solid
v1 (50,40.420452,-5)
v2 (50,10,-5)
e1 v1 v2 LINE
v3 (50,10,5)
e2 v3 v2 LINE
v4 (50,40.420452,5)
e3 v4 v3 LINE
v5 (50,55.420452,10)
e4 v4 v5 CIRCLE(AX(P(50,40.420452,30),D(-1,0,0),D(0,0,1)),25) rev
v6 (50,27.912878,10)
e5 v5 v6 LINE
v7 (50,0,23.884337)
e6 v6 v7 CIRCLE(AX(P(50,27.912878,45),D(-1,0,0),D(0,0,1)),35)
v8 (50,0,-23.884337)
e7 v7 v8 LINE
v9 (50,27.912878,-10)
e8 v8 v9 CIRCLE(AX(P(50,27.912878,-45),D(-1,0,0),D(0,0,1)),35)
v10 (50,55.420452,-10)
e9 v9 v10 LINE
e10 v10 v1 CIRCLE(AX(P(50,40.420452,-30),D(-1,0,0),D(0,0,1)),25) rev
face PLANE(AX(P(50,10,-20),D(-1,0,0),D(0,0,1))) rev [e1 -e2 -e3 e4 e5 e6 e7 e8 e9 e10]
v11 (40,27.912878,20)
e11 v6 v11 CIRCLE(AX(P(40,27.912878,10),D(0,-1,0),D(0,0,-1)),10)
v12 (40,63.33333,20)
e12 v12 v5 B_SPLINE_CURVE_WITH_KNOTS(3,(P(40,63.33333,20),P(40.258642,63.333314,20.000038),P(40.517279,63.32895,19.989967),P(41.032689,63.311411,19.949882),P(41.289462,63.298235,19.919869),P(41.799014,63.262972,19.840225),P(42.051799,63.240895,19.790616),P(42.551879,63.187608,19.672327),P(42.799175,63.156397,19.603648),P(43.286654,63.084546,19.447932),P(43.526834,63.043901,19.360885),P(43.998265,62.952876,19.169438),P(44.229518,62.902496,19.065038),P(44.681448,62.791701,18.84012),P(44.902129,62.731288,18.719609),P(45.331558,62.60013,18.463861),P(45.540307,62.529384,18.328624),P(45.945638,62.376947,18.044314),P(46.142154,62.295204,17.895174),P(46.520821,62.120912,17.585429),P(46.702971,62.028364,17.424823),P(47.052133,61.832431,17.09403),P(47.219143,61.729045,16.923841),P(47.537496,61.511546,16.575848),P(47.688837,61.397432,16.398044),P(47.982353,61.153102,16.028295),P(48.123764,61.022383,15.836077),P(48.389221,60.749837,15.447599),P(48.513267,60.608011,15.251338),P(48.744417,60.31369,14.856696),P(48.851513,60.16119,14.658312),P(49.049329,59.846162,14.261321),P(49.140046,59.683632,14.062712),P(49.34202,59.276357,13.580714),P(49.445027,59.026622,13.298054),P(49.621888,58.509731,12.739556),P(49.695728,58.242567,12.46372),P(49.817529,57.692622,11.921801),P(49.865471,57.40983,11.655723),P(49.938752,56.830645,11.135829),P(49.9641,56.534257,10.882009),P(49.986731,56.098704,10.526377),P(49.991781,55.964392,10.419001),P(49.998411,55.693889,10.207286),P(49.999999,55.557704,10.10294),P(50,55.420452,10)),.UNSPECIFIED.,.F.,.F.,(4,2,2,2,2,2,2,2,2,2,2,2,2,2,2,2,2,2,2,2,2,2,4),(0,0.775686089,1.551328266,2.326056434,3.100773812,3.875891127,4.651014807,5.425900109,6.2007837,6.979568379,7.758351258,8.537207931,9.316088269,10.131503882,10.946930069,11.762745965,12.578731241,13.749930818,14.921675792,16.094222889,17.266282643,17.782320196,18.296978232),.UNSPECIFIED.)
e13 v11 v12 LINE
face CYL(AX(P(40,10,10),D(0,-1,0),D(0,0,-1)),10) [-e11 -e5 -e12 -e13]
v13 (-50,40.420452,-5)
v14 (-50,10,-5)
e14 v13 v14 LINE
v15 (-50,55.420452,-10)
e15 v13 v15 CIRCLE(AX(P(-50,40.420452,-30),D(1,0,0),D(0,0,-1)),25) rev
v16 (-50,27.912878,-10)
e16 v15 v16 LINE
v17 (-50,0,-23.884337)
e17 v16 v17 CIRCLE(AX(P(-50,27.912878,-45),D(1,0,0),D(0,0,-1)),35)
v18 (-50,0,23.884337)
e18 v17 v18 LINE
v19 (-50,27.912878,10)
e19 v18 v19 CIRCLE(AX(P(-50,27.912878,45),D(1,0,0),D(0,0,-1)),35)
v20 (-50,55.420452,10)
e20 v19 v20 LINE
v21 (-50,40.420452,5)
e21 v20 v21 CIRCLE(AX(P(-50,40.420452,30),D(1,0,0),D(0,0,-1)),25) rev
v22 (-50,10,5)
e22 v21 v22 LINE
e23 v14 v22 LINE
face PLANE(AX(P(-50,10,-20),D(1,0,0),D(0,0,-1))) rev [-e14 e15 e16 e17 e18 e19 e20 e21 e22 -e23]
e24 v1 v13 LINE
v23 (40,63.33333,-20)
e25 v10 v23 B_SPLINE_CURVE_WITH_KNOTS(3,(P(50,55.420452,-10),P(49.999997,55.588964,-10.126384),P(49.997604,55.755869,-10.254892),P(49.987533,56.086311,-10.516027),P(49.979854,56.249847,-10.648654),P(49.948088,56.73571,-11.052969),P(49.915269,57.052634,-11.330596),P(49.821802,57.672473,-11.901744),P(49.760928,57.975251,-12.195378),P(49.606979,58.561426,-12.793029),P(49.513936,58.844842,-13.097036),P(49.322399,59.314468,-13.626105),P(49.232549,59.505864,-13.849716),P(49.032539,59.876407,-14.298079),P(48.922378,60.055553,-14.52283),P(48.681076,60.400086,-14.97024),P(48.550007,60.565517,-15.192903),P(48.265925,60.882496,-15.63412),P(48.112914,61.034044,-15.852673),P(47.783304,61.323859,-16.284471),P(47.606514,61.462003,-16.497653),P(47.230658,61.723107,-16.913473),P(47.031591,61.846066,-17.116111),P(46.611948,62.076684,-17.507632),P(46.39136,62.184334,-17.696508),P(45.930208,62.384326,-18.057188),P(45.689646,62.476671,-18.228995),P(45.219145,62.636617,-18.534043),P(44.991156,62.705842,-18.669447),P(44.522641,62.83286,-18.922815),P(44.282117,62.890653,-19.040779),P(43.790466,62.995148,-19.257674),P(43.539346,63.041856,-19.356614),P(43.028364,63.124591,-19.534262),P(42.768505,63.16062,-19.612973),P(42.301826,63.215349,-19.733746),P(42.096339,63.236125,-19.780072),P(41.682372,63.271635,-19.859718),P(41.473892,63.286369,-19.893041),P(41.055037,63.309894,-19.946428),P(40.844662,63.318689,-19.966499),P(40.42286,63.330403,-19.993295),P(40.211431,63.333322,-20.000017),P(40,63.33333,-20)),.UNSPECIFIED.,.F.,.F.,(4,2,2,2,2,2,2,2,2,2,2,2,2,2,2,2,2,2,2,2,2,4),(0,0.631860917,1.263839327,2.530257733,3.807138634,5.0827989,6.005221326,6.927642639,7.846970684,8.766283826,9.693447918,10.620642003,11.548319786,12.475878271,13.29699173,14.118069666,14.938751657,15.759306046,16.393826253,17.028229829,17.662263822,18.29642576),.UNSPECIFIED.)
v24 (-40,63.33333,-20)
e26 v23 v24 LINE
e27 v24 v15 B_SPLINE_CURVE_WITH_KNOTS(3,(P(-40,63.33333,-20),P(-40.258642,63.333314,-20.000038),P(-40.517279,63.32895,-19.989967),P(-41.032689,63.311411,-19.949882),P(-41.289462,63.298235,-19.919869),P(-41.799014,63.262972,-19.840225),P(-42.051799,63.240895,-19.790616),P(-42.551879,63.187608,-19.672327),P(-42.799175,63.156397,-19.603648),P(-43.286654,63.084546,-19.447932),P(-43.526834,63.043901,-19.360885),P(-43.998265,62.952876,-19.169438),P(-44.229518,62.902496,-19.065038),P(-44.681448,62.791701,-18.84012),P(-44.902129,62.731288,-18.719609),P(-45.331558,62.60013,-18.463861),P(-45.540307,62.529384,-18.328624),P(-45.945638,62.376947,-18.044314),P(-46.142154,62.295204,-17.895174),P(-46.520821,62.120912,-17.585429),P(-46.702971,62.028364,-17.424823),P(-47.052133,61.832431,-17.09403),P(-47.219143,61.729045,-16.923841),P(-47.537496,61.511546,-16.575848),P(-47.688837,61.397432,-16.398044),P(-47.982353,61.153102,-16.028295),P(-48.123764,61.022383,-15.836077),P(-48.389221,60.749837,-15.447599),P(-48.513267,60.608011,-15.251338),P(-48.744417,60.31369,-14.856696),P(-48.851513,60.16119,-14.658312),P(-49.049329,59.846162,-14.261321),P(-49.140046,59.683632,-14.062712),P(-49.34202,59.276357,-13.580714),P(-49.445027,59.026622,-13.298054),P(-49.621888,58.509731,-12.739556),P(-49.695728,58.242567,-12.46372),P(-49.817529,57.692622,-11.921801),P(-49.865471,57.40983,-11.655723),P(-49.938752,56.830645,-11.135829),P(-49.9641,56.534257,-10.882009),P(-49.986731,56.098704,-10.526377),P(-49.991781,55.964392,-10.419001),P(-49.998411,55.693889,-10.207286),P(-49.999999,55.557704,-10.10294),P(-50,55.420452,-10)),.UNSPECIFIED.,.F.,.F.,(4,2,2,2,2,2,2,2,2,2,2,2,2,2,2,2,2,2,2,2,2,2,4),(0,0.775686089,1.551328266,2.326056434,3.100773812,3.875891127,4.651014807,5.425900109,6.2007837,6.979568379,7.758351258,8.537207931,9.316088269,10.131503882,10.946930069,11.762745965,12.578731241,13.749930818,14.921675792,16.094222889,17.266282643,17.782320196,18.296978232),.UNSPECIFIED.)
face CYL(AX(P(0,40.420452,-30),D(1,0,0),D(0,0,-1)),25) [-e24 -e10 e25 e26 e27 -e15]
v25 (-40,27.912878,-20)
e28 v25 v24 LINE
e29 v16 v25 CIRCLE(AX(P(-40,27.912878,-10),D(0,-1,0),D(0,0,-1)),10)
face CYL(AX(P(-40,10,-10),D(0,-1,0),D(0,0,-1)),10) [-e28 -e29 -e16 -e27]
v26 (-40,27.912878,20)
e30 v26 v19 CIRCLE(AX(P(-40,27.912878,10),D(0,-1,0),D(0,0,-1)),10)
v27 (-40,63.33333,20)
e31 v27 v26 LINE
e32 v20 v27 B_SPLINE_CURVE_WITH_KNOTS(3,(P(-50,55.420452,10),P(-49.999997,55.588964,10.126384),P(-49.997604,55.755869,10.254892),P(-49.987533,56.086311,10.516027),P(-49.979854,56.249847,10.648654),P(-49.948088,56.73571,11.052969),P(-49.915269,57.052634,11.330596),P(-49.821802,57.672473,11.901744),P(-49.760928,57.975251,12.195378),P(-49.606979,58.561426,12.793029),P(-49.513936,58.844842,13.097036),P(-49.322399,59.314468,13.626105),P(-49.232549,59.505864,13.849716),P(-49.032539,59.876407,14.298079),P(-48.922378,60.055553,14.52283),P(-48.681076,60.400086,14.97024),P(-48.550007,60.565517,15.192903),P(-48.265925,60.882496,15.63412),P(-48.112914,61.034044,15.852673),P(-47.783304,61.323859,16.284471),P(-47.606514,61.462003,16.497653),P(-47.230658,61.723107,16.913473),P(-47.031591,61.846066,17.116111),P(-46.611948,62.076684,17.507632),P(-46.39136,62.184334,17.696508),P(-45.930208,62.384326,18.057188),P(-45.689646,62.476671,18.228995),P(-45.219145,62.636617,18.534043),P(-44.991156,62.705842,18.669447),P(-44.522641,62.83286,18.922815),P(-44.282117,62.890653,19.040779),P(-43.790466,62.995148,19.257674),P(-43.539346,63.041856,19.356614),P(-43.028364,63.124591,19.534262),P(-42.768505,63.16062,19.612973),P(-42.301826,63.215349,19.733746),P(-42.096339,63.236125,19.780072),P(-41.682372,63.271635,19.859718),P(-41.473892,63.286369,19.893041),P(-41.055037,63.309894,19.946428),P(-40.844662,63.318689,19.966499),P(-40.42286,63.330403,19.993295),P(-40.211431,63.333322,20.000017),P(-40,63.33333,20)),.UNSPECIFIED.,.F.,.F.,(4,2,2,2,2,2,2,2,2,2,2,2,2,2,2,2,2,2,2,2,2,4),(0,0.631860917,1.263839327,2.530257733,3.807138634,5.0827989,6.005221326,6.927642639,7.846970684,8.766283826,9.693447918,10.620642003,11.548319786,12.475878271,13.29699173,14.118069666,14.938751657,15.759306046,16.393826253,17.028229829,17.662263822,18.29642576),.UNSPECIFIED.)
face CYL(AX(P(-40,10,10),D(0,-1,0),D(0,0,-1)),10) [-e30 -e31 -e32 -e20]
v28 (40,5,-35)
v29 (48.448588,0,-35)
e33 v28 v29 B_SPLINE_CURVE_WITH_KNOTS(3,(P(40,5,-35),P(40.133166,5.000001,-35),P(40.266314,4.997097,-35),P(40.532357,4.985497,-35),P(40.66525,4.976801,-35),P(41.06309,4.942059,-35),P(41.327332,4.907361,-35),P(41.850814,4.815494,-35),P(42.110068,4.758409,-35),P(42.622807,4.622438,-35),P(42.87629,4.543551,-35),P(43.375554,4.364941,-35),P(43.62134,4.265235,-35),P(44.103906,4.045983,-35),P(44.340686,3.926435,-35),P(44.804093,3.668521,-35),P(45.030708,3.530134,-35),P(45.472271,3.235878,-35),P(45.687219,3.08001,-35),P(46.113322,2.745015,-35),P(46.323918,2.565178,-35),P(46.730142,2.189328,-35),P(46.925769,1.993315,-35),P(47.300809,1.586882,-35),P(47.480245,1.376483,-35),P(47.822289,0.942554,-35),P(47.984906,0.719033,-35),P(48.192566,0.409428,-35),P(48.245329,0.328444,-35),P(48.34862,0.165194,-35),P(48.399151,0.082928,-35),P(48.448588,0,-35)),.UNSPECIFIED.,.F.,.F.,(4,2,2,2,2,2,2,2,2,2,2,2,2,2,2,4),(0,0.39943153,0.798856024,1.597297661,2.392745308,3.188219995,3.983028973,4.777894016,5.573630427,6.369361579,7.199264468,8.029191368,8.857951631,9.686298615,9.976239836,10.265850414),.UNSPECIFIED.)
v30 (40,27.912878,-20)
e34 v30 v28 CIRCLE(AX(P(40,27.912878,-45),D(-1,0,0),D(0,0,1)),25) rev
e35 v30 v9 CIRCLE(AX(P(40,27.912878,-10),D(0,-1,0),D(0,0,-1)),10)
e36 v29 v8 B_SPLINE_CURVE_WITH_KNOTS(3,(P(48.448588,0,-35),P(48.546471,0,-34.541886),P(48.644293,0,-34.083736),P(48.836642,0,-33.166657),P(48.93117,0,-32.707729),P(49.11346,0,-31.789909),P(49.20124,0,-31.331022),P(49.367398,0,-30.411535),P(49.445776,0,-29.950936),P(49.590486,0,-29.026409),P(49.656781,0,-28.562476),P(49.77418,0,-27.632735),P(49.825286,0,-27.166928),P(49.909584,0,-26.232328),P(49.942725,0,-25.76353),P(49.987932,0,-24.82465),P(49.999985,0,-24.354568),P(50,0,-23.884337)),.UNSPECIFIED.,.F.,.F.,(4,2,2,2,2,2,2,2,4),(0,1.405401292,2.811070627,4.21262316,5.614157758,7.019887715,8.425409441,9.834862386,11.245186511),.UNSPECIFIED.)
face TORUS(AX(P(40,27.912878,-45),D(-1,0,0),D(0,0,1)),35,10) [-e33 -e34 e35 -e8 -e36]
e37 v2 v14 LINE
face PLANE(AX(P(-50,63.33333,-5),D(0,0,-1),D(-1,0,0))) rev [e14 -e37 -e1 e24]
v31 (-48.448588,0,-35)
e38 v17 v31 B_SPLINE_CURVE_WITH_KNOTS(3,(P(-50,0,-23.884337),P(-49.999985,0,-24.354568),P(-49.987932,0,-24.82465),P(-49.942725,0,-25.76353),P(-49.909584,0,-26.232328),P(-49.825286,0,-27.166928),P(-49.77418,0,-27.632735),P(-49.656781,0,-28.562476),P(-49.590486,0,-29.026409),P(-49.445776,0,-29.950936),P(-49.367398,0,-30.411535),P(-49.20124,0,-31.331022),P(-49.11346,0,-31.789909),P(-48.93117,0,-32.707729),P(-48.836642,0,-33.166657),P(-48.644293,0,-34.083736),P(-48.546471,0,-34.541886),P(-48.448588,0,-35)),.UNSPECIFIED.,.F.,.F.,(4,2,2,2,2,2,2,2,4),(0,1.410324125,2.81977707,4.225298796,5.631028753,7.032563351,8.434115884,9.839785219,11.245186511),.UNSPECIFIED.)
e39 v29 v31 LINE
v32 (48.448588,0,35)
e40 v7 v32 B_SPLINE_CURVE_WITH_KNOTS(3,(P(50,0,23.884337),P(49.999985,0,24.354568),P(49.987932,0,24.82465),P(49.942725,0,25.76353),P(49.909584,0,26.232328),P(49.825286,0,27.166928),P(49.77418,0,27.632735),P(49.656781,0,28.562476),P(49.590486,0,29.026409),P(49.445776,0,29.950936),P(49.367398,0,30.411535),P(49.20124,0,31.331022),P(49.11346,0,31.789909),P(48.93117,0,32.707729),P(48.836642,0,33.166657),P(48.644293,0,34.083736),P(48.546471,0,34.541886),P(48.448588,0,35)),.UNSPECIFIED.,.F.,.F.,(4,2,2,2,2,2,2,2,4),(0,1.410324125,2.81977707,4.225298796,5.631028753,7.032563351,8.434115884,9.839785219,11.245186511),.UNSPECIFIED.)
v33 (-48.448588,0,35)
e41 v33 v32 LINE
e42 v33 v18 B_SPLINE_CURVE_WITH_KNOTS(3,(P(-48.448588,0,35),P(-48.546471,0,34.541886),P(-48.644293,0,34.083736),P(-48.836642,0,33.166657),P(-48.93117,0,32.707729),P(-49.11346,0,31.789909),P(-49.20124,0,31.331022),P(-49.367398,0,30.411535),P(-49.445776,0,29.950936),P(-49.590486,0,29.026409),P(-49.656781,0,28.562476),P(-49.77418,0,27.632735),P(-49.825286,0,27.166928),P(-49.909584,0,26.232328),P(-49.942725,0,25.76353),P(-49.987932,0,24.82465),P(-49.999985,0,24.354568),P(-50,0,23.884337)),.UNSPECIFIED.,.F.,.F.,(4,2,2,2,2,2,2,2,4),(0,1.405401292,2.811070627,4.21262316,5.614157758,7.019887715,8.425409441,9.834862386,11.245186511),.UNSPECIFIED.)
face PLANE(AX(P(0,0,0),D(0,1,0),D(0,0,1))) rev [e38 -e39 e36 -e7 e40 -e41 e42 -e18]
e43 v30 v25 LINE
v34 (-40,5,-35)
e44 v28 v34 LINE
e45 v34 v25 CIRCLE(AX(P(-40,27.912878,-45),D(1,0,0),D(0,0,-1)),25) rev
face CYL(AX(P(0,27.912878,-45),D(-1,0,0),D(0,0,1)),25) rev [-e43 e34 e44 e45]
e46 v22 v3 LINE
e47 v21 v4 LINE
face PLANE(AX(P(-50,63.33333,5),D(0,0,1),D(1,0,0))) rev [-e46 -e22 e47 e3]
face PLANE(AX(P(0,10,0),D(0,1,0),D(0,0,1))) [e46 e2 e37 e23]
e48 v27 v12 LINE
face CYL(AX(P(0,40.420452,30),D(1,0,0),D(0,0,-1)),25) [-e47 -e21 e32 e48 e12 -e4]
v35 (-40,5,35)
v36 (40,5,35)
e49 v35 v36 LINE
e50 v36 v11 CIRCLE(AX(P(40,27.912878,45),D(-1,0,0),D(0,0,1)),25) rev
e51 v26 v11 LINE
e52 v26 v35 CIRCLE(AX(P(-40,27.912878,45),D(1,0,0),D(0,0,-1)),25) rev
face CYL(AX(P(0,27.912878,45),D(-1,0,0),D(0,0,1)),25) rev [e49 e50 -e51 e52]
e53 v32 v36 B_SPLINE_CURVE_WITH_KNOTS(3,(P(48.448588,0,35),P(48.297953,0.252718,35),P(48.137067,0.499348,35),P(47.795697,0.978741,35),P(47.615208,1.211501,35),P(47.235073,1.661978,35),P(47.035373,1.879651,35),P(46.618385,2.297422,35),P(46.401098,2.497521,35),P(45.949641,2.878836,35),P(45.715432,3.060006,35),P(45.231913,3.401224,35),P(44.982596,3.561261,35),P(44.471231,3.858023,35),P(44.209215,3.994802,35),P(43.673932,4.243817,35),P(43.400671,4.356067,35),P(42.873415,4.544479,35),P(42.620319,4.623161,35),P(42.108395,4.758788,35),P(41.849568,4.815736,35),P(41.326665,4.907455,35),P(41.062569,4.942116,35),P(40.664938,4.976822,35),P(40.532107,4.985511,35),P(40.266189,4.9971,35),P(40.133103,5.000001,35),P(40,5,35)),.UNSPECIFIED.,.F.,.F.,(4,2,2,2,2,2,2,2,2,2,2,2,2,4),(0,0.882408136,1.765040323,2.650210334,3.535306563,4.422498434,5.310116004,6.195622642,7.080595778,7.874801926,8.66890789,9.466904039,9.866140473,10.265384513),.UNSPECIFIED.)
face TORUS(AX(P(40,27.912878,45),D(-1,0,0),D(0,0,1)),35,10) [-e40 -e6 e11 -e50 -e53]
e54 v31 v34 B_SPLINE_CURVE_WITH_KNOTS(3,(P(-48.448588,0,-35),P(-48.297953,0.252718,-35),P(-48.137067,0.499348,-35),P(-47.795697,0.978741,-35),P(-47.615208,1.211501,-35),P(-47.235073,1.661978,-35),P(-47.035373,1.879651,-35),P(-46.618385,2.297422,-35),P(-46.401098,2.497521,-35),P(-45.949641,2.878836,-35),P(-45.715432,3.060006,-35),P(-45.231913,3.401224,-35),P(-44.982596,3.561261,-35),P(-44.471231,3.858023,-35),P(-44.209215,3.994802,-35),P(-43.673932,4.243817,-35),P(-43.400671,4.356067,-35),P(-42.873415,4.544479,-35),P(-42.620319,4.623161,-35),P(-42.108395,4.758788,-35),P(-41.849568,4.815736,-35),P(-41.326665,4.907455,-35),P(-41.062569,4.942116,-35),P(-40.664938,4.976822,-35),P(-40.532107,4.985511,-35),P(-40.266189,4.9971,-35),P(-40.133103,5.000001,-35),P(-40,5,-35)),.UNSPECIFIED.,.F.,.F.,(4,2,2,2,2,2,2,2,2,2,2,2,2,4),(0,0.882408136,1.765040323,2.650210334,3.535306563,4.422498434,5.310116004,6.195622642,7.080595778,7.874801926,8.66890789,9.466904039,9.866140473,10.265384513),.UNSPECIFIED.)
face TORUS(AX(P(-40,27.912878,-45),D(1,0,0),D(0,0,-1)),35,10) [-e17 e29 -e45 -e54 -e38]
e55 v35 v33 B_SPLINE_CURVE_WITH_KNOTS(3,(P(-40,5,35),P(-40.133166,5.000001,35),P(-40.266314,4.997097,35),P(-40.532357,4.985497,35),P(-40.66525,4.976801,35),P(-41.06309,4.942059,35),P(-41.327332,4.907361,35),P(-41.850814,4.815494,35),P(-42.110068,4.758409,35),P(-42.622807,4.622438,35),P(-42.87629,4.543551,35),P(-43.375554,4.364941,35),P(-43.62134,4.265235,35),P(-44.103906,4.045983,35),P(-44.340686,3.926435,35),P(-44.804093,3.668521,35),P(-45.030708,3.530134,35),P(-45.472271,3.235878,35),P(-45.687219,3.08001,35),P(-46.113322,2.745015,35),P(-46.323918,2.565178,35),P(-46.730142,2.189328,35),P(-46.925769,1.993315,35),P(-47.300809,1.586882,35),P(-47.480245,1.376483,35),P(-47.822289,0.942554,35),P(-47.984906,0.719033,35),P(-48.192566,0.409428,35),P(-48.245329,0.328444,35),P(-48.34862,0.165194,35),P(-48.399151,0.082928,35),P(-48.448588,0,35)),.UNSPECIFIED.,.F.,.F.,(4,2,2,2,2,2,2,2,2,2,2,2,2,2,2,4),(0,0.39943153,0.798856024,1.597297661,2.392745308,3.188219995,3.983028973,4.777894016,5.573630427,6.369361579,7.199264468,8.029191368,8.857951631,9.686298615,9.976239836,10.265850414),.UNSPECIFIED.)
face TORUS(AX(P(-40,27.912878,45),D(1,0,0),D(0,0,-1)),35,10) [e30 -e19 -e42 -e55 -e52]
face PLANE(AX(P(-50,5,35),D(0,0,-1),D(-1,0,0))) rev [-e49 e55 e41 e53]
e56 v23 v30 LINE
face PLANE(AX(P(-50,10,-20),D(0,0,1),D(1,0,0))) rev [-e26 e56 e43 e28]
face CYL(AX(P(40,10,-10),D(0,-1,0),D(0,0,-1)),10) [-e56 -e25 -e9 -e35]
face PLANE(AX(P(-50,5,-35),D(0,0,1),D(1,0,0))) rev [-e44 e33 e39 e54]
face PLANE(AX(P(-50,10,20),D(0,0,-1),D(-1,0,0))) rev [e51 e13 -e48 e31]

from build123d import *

# Parameters (mm, degrees)
SKETCH2_W           = 100
SKETCH2_H           = 40
BOSS_EXTRUDE1_DEPTH = 10
SKETCH4_W           = 100
SKETCH4_H           = 15
BOSS_EXTRUDE2_DEPTH = 63.33333
FILLET1_R           = 25
FILLET2_R           = 25
SKETCH5_W           = 100
SKETCH5_H           = 15
BOSS_EXTRUDE3_DEPTH = 5
FILLET3_R           = 25
FILLET4_R           = 25
FILLET10_R          = 10
FILLET11_R          = 10


with BuildPart() as part:
    # Sketch2 → Boss-Extrude1 (new body)
    with BuildSketch(Plane(origin=(0, 0, 0), x_dir=(1, 0, 0), z_dir=(0, 1, 0))):
        Rectangle(SKETCH2_W, SKETCH2_H)
    extrude(amount=BOSS_EXTRUDE1_DEPTH)

    # Sketch4 → Boss-Extrude2 (add)
    with BuildSketch(Plane(origin=(0, 0, 0), x_dir=(1, 0, 0), z_dir=(0, 1, 0))):
        with Locations((0, -12.5)):
            Rectangle(SKETCH4_W, SKETCH4_H)
        with Locations((0, 12.5)):
            Rectangle(SKETCH4_W, SKETCH4_H)
    extrude(amount=BOSS_EXTRUDE2_DEPTH)

    # Fillet1
    # the kernel refuses this fillet: 25 mm, written as the material it takes off along each edge
    with BuildSketch(Plane(origin=(107.282196187, 63.33333, 5), x_dir=(0, 0, 1), z_dir=(-1, 0, 0))) as fillet1_piece_1:
        with BuildLine():
            CenterArc((25, -22.912878475), FILLET1_R, 113.578178478, 66.421821522)
            Line((0, -22.912878475), (-0.5, -22.912878475))
            Line((-0.5, -22.912878475), (-0.5, 0))
            Line((-0.5, 0), (0, 0.5))
            ThreePointArc((0, 0.5), (7.5, 0.5), (14.8, 0.458257569))
            Line((14.8, 0.458257569), (15, 0))
        make_face()
    extrude(amount=214.564392374, mode=Mode.SUBTRACT)

    # Fillet2
    # the kernel refuses this fillet: 25 mm, written as the material it takes off along each edge
    with BuildSketch(Plane(origin=(107.282196187, 63.33333, -5), x_dir=(0, 0, -1), z_dir=(-1, 0, 0))) as fillet2_piece_1:
        with BuildLine():
            CenterArc((25, 22.912878475), FILLET2_R, 180, 66.421821522)
            Line((0, 22.912878475), (-0.5, 22.912878475))
            Line((-0.5, 22.912878475), (-0.5, 0))
            Line((-0.5, 0), (0, -0.5))
            ThreePointArc((0, -0.5), (7.5, -0.5), (14.8, -0.458257569))
            Line((14.8, -0.458257569), (15, 0))
        make_face()
    extrude(amount=214.564392374, mode=Mode.SUBTRACT)

    # Sketch5 → Boss-Extrude3 (add)
    with BuildSketch(Plane(origin=(0, 0, 0), x_dir=(1, 0, 0), z_dir=(0, 1, 0))):
        with Locations((0, -27.5)):
            Rectangle(SKETCH5_W, SKETCH5_H)
        with Locations((0, 27.5)):
            Rectangle(SKETCH5_W, SKETCH5_H)
    extrude(amount=BOSS_EXTRUDE3_DEPTH)

    # Fillet3
    # the kernel refuses this fillet: 25 mm, written as the material it adds along each edge
    with BuildSketch(Plane(origin=(-50, 5, 20), x_dir=(0, 1, 0), z_dir=(1, 0, 0))) as fillet3_piece_1:
        with BuildLine():
            CenterArc((22.912878475, 25), FILLET3_R, 203.578178478, 66.421821522)
            Line((0, 15), (-0.458257569, 14.8))
            ThreePointArc((-0.458257569, 14.8), (-0.5, 7.5), (-0.5, 0))
            Line((-0.5, 0), (0, -0.5))
            Line((0, -0.5), (22.912878475, -0.5))
            Line((22.912878475, -0.5), (22.912878475, 0))
        make_face()
    extrude(amount=100)

    # Fillet4
    # the kernel refuses this fillet: 25 mm, written as the material it adds along each edge
    with BuildSketch(Plane(origin=(-50, 5, -20), x_dir=(0, 1, 0), z_dir=(1, 0, 0))) as fillet4_piece_1:
        with BuildLine():
            CenterArc((22.912878475, -25), FILLET4_R, 90, 66.421821522)
            Line((0, -15), (-0.458257569, -14.8))
            ThreePointArc((-0.458257569, -14.8), (-0.5, -7.5), (-0.5, 0))
            Line((-0.5, 0), (0, 0.5))
            Line((0, 0.5), (22.912878475, 0.5))
            Line((22.912878475, 0.5), (22.912878475, 0))
        make_face()
    extrude(amount=100)

    # Fillet10
    fillet10_edges = [part.edges().sort_by_distance(p)[0] for p in [
        (-50, 14.219814537, -24.083499337),
        (-50, 45.623104237, -20),
    ]]
    fillet(fillet10_edges, radius=FILLET10_R)

    # Fillet11
    fillet11_edges = [part.edges().sort_by_distance(p)[0] for p in [
        (50, 14.219814537, -24.083499337),
        (50, 14.219814537, 24.083499337),
        (-50, 14.219814537, 24.083499337),
        (50, 45.623104237, -20),
        (50, 45.623104237, 20),
        (-50, 45.623104237, 20),
    ]]
    fillet(fillet11_edges, radius=FILLET11_R)


solid = part.part
